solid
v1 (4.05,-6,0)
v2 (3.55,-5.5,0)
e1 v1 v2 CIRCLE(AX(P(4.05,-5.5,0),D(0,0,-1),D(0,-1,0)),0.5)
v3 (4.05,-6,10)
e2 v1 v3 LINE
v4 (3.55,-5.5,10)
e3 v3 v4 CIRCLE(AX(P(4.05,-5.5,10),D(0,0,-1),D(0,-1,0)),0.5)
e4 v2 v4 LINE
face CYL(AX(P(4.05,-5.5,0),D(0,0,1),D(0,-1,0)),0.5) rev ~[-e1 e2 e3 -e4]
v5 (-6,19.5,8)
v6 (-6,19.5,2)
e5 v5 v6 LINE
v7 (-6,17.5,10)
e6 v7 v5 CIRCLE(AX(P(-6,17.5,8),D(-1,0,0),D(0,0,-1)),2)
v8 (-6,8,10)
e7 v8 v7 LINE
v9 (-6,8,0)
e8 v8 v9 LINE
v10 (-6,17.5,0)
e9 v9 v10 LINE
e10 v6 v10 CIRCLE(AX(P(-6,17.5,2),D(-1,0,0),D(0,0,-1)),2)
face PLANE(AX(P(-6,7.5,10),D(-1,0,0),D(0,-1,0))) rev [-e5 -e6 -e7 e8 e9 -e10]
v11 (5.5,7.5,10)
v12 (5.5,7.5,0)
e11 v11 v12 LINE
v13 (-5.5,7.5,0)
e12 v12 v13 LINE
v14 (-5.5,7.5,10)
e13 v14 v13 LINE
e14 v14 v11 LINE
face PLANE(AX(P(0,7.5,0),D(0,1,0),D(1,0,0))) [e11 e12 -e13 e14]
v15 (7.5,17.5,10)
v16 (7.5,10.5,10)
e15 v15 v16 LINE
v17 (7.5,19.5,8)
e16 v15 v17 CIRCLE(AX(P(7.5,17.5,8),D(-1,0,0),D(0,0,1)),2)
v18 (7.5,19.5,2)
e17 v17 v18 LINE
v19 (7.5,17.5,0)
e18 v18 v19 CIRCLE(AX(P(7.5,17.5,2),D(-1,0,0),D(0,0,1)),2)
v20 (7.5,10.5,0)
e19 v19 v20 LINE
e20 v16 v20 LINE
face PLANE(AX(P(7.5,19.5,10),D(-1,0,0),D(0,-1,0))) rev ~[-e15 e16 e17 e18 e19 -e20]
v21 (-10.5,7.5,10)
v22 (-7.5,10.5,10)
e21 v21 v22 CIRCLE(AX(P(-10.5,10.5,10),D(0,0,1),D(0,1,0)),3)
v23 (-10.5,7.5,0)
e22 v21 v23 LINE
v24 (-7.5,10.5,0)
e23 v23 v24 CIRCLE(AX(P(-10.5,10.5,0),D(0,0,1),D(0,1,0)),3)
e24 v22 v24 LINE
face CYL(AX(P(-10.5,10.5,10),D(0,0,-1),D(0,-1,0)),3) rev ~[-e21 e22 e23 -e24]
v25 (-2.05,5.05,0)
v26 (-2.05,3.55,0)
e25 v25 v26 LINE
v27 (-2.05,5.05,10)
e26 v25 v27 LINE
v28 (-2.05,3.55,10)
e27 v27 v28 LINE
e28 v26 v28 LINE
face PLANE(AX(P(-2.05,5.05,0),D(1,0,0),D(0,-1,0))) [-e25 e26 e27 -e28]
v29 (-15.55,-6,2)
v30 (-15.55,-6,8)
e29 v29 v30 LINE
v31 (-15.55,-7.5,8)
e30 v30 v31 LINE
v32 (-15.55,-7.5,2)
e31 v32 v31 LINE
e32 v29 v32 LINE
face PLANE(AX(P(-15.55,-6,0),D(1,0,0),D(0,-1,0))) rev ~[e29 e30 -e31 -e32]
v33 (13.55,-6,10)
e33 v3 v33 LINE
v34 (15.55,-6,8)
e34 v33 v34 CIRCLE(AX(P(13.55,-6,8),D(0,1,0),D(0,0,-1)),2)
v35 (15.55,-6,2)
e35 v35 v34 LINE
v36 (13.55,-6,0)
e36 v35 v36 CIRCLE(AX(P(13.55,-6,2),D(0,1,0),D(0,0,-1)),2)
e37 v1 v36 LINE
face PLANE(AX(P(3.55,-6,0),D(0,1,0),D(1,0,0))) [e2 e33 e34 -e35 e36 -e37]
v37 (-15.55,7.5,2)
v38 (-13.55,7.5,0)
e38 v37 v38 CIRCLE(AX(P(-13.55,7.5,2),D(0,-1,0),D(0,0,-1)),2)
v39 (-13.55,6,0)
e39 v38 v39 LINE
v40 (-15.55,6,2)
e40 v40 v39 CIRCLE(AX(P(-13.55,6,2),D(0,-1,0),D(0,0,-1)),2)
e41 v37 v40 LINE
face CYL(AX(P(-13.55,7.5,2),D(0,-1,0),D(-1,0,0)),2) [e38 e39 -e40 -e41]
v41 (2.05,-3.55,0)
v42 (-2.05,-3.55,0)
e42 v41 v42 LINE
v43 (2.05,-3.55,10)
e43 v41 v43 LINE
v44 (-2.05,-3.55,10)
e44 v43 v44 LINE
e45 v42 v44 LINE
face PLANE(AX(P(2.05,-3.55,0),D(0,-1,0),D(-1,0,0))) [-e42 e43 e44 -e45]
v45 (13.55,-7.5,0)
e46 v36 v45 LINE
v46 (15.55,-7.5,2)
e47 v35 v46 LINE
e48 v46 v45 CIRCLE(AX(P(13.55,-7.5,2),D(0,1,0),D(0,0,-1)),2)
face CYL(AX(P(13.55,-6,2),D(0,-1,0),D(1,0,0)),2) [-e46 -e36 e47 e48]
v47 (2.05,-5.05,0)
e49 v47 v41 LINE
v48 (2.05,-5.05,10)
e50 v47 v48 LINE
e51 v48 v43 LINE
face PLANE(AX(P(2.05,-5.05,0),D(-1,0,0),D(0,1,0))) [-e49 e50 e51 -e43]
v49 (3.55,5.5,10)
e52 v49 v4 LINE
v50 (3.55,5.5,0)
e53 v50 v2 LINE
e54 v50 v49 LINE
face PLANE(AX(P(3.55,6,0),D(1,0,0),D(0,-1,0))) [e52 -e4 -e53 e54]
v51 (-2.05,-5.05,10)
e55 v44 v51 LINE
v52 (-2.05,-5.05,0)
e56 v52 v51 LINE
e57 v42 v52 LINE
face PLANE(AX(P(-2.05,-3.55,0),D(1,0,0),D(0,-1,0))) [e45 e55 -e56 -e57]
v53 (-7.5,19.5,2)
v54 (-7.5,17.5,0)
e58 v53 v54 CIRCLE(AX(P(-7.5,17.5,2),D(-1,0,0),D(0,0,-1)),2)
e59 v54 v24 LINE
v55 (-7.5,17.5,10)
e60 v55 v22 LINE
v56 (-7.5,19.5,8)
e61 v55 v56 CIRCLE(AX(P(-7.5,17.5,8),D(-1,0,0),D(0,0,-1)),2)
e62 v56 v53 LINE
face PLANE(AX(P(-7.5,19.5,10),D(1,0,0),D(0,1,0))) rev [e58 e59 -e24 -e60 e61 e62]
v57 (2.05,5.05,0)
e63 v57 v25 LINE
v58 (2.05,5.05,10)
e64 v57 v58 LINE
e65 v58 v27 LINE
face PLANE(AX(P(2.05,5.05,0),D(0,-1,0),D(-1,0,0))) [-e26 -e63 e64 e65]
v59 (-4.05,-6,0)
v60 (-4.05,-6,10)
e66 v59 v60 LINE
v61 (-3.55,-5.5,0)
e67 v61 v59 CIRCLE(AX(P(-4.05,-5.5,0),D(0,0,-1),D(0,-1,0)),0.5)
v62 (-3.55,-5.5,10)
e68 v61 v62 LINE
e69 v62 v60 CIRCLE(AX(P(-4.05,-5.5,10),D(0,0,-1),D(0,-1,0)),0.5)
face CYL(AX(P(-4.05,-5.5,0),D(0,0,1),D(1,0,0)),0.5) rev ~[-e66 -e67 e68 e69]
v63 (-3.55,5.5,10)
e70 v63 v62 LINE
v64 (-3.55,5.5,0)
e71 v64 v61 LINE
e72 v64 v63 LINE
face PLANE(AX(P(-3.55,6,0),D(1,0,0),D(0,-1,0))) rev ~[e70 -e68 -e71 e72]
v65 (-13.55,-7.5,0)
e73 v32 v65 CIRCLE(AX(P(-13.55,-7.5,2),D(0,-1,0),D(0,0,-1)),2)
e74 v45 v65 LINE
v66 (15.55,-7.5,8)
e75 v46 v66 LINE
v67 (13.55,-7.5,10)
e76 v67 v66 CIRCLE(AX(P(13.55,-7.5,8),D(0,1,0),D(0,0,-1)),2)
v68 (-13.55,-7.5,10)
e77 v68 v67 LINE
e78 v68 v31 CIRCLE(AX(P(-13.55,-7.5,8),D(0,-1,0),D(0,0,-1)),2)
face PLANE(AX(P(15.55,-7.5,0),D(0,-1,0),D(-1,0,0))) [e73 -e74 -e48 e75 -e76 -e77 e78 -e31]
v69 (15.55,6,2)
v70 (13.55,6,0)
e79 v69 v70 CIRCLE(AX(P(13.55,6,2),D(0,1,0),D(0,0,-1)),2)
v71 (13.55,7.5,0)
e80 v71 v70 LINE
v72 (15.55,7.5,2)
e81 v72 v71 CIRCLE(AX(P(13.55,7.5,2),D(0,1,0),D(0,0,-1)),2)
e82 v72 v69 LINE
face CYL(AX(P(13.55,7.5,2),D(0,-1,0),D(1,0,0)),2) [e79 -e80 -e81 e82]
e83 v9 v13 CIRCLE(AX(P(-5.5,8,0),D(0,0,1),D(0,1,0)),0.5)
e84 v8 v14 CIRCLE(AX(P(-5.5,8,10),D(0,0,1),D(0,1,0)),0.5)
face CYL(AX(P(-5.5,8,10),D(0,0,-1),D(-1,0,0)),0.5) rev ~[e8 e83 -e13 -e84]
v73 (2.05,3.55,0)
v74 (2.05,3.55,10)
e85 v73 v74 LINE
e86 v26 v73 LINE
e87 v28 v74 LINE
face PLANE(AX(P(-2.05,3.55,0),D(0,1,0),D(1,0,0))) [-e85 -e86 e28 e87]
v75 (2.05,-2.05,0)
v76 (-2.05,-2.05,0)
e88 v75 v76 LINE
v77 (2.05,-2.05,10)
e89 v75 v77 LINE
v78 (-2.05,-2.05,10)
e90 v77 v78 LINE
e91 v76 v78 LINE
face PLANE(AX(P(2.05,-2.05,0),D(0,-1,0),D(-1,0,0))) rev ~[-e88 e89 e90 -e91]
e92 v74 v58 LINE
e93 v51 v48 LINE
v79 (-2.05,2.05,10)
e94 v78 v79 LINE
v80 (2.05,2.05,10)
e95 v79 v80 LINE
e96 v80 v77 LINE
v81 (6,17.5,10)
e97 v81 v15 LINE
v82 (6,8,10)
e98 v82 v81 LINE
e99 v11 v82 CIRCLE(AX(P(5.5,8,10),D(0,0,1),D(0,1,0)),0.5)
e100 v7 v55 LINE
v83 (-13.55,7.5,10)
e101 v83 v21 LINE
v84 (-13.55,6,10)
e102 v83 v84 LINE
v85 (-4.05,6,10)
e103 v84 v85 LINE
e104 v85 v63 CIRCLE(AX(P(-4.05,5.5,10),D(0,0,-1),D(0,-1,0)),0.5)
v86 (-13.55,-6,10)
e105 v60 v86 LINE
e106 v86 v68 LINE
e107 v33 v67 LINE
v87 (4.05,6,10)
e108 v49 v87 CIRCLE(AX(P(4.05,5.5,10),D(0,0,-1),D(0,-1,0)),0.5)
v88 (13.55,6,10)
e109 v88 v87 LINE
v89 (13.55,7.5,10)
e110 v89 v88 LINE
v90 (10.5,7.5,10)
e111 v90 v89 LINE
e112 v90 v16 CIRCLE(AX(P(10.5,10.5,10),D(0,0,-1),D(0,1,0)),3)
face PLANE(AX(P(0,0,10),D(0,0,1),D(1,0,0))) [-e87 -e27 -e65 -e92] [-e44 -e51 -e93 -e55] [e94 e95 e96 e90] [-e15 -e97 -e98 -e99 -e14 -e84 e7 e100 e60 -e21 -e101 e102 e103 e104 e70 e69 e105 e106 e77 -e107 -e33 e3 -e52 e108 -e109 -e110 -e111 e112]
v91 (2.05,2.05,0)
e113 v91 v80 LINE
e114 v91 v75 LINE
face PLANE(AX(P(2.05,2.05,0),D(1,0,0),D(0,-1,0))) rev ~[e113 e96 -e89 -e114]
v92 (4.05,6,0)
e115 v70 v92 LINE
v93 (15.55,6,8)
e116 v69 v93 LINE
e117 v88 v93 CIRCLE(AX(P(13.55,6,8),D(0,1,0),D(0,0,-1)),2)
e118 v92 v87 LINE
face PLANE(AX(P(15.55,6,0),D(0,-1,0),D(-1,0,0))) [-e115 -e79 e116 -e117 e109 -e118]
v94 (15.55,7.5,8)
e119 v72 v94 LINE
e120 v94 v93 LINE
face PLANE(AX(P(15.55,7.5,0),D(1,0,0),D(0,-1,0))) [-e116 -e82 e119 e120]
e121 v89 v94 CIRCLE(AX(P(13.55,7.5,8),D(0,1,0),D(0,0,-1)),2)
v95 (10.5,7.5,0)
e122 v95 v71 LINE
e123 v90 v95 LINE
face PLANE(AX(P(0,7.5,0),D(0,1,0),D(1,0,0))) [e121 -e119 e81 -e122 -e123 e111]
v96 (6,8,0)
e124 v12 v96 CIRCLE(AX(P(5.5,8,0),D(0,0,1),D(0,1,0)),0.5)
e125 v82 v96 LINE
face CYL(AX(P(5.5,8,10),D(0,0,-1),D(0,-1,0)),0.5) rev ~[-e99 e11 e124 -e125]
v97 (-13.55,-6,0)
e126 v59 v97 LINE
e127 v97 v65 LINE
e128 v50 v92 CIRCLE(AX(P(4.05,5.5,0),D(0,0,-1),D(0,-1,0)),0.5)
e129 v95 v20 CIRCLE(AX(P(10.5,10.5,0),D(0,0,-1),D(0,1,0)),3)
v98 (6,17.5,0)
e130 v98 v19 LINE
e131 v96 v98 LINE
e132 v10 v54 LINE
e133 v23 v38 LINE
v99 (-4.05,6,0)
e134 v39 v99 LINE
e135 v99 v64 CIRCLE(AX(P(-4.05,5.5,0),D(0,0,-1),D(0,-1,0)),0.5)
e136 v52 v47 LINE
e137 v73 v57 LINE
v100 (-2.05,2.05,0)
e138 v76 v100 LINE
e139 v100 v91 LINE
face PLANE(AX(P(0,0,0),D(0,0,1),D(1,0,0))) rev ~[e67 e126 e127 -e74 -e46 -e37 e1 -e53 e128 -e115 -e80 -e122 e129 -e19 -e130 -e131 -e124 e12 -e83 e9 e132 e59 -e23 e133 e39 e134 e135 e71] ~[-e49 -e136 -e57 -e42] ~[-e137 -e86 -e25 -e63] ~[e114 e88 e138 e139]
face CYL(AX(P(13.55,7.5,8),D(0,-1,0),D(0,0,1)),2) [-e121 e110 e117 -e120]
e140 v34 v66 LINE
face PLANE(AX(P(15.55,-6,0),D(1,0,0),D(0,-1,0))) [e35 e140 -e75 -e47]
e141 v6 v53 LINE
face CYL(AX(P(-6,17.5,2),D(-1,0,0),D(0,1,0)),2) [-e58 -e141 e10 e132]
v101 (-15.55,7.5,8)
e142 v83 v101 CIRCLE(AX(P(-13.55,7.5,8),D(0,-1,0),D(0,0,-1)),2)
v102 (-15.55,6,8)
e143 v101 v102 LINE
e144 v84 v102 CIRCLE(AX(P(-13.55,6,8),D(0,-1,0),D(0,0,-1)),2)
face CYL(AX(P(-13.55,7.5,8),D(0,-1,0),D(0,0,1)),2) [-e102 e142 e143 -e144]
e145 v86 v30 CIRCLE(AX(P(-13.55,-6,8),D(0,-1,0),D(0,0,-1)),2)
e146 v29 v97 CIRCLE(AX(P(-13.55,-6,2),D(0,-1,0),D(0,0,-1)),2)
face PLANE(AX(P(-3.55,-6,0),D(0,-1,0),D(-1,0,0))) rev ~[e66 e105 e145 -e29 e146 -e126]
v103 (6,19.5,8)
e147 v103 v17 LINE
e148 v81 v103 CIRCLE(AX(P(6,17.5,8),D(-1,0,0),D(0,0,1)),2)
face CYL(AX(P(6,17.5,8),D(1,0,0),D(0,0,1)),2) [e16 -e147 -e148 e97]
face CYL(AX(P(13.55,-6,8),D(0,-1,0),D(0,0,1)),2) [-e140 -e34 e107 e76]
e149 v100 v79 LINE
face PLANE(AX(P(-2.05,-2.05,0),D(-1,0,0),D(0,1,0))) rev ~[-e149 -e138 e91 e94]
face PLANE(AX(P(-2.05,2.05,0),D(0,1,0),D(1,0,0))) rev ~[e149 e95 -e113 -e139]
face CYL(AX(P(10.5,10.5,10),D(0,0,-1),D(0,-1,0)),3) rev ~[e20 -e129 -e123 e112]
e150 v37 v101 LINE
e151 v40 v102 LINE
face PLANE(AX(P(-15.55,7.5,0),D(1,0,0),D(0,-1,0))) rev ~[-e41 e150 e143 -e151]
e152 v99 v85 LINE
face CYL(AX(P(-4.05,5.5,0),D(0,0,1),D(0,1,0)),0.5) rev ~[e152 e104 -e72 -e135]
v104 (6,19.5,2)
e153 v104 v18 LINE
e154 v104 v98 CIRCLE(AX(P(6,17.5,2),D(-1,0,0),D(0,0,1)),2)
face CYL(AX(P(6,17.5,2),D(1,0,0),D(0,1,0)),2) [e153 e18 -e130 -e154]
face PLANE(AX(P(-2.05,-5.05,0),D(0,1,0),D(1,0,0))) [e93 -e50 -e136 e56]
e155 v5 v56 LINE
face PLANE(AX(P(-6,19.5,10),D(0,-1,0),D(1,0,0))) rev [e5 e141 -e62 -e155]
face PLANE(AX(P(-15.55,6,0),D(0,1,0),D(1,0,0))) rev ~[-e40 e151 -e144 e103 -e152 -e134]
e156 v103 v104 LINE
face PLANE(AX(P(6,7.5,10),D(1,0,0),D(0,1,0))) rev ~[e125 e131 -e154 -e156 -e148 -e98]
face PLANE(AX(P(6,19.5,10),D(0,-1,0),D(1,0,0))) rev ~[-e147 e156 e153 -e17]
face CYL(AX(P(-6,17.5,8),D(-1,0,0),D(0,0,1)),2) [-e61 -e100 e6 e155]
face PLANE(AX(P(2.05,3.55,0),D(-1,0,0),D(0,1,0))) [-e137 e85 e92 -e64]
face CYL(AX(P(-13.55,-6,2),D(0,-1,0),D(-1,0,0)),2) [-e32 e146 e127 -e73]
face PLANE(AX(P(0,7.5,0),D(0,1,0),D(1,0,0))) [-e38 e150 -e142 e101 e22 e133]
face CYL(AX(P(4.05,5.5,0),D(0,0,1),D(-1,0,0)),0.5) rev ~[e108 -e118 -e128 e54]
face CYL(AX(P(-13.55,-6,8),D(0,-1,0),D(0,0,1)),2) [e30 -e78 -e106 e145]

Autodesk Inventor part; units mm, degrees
ref_plane "XZ Plane" through (0, 0, 0) normal (0, 1, 0) x (-1, 0, 0)
sketch "Sketch1" plane through (0, 0, 0) normal (0, 0, 1) x (1, 0, 0)
  line L0 (-2.05, 2.05) -> (2.05, 2.05)
  line L1 (2.05, 2.05) -> (2.05, -2.05)
  line L2 (2.05, -2.05) -> (-2.05, -2.05)
  line L3 (-2.05, -2.05) -> (-2.05, 2.05)
  line L4 (0, 2.05) -> (0, -2.05) construction
  line L5 (0, 7.5) -> (-15.55, 7.5)
  line L6 (-15.55, 7.5) -> (-15.55, 6)
  line L7 (-15.55, 6) -> (-3.55, 6)
  line L8 (-3.55, 6) -> (-3.55, -6)
  line L9 (-3.55, -6) -> (-15.55, -6)
  line L10 (-15.55, -6) -> (-15.55, -7.5)
  line L11 (-15.55, -7.5) -> (-0.55, -7.5)
  line L12 (-2.05, 0) -> (2.05, 0) construction
  line L13 (0, 7.5) -> (15.55, 7.5)
  line L14 (15.55, 7.5) -> (15.55, 6)
  line L15 (15.55, 6) -> (3.55, 6)
  line L16 (3.55, 6) -> (3.55, -6)
  line L17 (3.55, -6) -> (15.55, -6)
  line L18 (15.55, -6) -> (15.55, -7.5)
  line L19 (15.55, -7.5) -> (-0.55, -7.5)
  line L20 (-2.05, 2.05) -> (2.05, -2.05) construction
  line L21 (2.05, 2.05) -> (-2.05, -2.05) construction
  line L22 (0, 7.5) -> (0, 2.05) construction
  point P0 (0, 0)
  point P1 (0, 0)
  point P2 (0, 0)
  dimension "d3" = 4.1
  dimension "d4" = 4.1
  dimension "d5" = 12
  dimension "d6" = 1.5
  dimension "d7" = 1.5
  dimension "d8" = 5.45
  dimension "d9" = 5.45
  dimension "d10" = 1.5
  dimension "d11" = 12
  dimension "d37" = 15
extrude "Extrusion1" add sketch "Sketch1" along normal blind 10
sketch "Sketch5" plane through (0, 0, 10) normal (0, 0, 1) x (1, 0, 0)
  line L0 (6, 19.5) -> (7.5, 19.5)
  line L1 (7.5, 19.5) -> (7.5, 7.5)
  line L2 (7.5, 7.5) -> (6, 7.5)
  line L3 (6, 7.5) -> (6, 19.5)
  line L4 (15.55, 7.5) -> (-15.55, 7.5) projected
  line L5 (3.55, -6) -> (3.55, 6) projected
  line L6 (0, 0) -> (0, 23.4065) construction
  dimension "d41" = 1.5
  dimension "d42" = 12
  dimension "d47" = 6
extrude "Extrusion5" add sketch "Sketch5" against normal up to surface (10 mm away)
mirror "Mirror1" about plane through (0, 0, 0) normal (1, 0, 0) of "Extrusion5"
fillet "Fillet1" radius 3 2 edges at (-7.5, 7.5, 5) (7.5, 7.5, 5)
fillet "Fillet2" radius 0.5 6 edges at (-3.55, 6, 5) (-3.55, -6, 5) (3.55, -6, 5) (3.55, 6, 5) (-6, 7.5, 5) (6, 7.5, 5)
fillet "Fillet3" radius 2 12 edges at (-6.75, 19.5, 10) (-15.55, 6.75, 10) (-6.75, 19.5, 0) (6.75, 19.5, 0) (6.75, 19.5, 10) (15.55, 6.75, 10) (15.55, 6.75, 0) (15.55, -6.75, 0) (15.55, -6.75, 10) (-15.55, -6.75, 10) (-15.55, -6.75, 0) (-15.55, 6.75, 0)
sketch "Sketch7" plane through (0, 0, 0) normal (0, 0, -1) x (-1, 0, 0)
  line L0 (-2.05, 5.05) -> (2.05, 5.05)
  line L1 (2.05, 5.05) -> (2.05, 3.55)
  line L2 (2.05, 3.55) -> (-2.05, 3.55)
  line L3 (-2.05, 3.55) -> (-2.05, 5.05)
  line L4 (-2.05, -3.55) -> (2.05, -3.55)
  line L5 (2.05, -3.55) -> (2.05, -5.05)
  line L6 (2.05, -5.05) -> (-2.05, -5.05)
  line L7 (-2.05, -5.05) -> (-2.05, -3.55)
  line L8 (2.05, 2.05) -> (-2.05, 2.05) projected
  line L9 (-2.05, -2.05) -> (2.05, -2.05) projected
  line L10 (2.05, -2.05) -> (2.05, 2.05) projected
  line L11 (-2.05, 2.05) -> (-2.05, -2.05) projected
  point P0 (0, 0)
  dimension "d55" = 1.5
  dimension "d56" = 1.5
  dimension "d57" = 1.5
  dimension "d58" = 1.5
extrude "Extrusion7" cut sketch "Sketch7" against normal blind 10 contours L0 L1 L2 L3 | L4 L5 L6 L7
equation "\"d7\" = d6"
equation "\"d8\" = d9"
properties part number "fuselage_tail_interface_airfoiled" material "ABS Plastic"
